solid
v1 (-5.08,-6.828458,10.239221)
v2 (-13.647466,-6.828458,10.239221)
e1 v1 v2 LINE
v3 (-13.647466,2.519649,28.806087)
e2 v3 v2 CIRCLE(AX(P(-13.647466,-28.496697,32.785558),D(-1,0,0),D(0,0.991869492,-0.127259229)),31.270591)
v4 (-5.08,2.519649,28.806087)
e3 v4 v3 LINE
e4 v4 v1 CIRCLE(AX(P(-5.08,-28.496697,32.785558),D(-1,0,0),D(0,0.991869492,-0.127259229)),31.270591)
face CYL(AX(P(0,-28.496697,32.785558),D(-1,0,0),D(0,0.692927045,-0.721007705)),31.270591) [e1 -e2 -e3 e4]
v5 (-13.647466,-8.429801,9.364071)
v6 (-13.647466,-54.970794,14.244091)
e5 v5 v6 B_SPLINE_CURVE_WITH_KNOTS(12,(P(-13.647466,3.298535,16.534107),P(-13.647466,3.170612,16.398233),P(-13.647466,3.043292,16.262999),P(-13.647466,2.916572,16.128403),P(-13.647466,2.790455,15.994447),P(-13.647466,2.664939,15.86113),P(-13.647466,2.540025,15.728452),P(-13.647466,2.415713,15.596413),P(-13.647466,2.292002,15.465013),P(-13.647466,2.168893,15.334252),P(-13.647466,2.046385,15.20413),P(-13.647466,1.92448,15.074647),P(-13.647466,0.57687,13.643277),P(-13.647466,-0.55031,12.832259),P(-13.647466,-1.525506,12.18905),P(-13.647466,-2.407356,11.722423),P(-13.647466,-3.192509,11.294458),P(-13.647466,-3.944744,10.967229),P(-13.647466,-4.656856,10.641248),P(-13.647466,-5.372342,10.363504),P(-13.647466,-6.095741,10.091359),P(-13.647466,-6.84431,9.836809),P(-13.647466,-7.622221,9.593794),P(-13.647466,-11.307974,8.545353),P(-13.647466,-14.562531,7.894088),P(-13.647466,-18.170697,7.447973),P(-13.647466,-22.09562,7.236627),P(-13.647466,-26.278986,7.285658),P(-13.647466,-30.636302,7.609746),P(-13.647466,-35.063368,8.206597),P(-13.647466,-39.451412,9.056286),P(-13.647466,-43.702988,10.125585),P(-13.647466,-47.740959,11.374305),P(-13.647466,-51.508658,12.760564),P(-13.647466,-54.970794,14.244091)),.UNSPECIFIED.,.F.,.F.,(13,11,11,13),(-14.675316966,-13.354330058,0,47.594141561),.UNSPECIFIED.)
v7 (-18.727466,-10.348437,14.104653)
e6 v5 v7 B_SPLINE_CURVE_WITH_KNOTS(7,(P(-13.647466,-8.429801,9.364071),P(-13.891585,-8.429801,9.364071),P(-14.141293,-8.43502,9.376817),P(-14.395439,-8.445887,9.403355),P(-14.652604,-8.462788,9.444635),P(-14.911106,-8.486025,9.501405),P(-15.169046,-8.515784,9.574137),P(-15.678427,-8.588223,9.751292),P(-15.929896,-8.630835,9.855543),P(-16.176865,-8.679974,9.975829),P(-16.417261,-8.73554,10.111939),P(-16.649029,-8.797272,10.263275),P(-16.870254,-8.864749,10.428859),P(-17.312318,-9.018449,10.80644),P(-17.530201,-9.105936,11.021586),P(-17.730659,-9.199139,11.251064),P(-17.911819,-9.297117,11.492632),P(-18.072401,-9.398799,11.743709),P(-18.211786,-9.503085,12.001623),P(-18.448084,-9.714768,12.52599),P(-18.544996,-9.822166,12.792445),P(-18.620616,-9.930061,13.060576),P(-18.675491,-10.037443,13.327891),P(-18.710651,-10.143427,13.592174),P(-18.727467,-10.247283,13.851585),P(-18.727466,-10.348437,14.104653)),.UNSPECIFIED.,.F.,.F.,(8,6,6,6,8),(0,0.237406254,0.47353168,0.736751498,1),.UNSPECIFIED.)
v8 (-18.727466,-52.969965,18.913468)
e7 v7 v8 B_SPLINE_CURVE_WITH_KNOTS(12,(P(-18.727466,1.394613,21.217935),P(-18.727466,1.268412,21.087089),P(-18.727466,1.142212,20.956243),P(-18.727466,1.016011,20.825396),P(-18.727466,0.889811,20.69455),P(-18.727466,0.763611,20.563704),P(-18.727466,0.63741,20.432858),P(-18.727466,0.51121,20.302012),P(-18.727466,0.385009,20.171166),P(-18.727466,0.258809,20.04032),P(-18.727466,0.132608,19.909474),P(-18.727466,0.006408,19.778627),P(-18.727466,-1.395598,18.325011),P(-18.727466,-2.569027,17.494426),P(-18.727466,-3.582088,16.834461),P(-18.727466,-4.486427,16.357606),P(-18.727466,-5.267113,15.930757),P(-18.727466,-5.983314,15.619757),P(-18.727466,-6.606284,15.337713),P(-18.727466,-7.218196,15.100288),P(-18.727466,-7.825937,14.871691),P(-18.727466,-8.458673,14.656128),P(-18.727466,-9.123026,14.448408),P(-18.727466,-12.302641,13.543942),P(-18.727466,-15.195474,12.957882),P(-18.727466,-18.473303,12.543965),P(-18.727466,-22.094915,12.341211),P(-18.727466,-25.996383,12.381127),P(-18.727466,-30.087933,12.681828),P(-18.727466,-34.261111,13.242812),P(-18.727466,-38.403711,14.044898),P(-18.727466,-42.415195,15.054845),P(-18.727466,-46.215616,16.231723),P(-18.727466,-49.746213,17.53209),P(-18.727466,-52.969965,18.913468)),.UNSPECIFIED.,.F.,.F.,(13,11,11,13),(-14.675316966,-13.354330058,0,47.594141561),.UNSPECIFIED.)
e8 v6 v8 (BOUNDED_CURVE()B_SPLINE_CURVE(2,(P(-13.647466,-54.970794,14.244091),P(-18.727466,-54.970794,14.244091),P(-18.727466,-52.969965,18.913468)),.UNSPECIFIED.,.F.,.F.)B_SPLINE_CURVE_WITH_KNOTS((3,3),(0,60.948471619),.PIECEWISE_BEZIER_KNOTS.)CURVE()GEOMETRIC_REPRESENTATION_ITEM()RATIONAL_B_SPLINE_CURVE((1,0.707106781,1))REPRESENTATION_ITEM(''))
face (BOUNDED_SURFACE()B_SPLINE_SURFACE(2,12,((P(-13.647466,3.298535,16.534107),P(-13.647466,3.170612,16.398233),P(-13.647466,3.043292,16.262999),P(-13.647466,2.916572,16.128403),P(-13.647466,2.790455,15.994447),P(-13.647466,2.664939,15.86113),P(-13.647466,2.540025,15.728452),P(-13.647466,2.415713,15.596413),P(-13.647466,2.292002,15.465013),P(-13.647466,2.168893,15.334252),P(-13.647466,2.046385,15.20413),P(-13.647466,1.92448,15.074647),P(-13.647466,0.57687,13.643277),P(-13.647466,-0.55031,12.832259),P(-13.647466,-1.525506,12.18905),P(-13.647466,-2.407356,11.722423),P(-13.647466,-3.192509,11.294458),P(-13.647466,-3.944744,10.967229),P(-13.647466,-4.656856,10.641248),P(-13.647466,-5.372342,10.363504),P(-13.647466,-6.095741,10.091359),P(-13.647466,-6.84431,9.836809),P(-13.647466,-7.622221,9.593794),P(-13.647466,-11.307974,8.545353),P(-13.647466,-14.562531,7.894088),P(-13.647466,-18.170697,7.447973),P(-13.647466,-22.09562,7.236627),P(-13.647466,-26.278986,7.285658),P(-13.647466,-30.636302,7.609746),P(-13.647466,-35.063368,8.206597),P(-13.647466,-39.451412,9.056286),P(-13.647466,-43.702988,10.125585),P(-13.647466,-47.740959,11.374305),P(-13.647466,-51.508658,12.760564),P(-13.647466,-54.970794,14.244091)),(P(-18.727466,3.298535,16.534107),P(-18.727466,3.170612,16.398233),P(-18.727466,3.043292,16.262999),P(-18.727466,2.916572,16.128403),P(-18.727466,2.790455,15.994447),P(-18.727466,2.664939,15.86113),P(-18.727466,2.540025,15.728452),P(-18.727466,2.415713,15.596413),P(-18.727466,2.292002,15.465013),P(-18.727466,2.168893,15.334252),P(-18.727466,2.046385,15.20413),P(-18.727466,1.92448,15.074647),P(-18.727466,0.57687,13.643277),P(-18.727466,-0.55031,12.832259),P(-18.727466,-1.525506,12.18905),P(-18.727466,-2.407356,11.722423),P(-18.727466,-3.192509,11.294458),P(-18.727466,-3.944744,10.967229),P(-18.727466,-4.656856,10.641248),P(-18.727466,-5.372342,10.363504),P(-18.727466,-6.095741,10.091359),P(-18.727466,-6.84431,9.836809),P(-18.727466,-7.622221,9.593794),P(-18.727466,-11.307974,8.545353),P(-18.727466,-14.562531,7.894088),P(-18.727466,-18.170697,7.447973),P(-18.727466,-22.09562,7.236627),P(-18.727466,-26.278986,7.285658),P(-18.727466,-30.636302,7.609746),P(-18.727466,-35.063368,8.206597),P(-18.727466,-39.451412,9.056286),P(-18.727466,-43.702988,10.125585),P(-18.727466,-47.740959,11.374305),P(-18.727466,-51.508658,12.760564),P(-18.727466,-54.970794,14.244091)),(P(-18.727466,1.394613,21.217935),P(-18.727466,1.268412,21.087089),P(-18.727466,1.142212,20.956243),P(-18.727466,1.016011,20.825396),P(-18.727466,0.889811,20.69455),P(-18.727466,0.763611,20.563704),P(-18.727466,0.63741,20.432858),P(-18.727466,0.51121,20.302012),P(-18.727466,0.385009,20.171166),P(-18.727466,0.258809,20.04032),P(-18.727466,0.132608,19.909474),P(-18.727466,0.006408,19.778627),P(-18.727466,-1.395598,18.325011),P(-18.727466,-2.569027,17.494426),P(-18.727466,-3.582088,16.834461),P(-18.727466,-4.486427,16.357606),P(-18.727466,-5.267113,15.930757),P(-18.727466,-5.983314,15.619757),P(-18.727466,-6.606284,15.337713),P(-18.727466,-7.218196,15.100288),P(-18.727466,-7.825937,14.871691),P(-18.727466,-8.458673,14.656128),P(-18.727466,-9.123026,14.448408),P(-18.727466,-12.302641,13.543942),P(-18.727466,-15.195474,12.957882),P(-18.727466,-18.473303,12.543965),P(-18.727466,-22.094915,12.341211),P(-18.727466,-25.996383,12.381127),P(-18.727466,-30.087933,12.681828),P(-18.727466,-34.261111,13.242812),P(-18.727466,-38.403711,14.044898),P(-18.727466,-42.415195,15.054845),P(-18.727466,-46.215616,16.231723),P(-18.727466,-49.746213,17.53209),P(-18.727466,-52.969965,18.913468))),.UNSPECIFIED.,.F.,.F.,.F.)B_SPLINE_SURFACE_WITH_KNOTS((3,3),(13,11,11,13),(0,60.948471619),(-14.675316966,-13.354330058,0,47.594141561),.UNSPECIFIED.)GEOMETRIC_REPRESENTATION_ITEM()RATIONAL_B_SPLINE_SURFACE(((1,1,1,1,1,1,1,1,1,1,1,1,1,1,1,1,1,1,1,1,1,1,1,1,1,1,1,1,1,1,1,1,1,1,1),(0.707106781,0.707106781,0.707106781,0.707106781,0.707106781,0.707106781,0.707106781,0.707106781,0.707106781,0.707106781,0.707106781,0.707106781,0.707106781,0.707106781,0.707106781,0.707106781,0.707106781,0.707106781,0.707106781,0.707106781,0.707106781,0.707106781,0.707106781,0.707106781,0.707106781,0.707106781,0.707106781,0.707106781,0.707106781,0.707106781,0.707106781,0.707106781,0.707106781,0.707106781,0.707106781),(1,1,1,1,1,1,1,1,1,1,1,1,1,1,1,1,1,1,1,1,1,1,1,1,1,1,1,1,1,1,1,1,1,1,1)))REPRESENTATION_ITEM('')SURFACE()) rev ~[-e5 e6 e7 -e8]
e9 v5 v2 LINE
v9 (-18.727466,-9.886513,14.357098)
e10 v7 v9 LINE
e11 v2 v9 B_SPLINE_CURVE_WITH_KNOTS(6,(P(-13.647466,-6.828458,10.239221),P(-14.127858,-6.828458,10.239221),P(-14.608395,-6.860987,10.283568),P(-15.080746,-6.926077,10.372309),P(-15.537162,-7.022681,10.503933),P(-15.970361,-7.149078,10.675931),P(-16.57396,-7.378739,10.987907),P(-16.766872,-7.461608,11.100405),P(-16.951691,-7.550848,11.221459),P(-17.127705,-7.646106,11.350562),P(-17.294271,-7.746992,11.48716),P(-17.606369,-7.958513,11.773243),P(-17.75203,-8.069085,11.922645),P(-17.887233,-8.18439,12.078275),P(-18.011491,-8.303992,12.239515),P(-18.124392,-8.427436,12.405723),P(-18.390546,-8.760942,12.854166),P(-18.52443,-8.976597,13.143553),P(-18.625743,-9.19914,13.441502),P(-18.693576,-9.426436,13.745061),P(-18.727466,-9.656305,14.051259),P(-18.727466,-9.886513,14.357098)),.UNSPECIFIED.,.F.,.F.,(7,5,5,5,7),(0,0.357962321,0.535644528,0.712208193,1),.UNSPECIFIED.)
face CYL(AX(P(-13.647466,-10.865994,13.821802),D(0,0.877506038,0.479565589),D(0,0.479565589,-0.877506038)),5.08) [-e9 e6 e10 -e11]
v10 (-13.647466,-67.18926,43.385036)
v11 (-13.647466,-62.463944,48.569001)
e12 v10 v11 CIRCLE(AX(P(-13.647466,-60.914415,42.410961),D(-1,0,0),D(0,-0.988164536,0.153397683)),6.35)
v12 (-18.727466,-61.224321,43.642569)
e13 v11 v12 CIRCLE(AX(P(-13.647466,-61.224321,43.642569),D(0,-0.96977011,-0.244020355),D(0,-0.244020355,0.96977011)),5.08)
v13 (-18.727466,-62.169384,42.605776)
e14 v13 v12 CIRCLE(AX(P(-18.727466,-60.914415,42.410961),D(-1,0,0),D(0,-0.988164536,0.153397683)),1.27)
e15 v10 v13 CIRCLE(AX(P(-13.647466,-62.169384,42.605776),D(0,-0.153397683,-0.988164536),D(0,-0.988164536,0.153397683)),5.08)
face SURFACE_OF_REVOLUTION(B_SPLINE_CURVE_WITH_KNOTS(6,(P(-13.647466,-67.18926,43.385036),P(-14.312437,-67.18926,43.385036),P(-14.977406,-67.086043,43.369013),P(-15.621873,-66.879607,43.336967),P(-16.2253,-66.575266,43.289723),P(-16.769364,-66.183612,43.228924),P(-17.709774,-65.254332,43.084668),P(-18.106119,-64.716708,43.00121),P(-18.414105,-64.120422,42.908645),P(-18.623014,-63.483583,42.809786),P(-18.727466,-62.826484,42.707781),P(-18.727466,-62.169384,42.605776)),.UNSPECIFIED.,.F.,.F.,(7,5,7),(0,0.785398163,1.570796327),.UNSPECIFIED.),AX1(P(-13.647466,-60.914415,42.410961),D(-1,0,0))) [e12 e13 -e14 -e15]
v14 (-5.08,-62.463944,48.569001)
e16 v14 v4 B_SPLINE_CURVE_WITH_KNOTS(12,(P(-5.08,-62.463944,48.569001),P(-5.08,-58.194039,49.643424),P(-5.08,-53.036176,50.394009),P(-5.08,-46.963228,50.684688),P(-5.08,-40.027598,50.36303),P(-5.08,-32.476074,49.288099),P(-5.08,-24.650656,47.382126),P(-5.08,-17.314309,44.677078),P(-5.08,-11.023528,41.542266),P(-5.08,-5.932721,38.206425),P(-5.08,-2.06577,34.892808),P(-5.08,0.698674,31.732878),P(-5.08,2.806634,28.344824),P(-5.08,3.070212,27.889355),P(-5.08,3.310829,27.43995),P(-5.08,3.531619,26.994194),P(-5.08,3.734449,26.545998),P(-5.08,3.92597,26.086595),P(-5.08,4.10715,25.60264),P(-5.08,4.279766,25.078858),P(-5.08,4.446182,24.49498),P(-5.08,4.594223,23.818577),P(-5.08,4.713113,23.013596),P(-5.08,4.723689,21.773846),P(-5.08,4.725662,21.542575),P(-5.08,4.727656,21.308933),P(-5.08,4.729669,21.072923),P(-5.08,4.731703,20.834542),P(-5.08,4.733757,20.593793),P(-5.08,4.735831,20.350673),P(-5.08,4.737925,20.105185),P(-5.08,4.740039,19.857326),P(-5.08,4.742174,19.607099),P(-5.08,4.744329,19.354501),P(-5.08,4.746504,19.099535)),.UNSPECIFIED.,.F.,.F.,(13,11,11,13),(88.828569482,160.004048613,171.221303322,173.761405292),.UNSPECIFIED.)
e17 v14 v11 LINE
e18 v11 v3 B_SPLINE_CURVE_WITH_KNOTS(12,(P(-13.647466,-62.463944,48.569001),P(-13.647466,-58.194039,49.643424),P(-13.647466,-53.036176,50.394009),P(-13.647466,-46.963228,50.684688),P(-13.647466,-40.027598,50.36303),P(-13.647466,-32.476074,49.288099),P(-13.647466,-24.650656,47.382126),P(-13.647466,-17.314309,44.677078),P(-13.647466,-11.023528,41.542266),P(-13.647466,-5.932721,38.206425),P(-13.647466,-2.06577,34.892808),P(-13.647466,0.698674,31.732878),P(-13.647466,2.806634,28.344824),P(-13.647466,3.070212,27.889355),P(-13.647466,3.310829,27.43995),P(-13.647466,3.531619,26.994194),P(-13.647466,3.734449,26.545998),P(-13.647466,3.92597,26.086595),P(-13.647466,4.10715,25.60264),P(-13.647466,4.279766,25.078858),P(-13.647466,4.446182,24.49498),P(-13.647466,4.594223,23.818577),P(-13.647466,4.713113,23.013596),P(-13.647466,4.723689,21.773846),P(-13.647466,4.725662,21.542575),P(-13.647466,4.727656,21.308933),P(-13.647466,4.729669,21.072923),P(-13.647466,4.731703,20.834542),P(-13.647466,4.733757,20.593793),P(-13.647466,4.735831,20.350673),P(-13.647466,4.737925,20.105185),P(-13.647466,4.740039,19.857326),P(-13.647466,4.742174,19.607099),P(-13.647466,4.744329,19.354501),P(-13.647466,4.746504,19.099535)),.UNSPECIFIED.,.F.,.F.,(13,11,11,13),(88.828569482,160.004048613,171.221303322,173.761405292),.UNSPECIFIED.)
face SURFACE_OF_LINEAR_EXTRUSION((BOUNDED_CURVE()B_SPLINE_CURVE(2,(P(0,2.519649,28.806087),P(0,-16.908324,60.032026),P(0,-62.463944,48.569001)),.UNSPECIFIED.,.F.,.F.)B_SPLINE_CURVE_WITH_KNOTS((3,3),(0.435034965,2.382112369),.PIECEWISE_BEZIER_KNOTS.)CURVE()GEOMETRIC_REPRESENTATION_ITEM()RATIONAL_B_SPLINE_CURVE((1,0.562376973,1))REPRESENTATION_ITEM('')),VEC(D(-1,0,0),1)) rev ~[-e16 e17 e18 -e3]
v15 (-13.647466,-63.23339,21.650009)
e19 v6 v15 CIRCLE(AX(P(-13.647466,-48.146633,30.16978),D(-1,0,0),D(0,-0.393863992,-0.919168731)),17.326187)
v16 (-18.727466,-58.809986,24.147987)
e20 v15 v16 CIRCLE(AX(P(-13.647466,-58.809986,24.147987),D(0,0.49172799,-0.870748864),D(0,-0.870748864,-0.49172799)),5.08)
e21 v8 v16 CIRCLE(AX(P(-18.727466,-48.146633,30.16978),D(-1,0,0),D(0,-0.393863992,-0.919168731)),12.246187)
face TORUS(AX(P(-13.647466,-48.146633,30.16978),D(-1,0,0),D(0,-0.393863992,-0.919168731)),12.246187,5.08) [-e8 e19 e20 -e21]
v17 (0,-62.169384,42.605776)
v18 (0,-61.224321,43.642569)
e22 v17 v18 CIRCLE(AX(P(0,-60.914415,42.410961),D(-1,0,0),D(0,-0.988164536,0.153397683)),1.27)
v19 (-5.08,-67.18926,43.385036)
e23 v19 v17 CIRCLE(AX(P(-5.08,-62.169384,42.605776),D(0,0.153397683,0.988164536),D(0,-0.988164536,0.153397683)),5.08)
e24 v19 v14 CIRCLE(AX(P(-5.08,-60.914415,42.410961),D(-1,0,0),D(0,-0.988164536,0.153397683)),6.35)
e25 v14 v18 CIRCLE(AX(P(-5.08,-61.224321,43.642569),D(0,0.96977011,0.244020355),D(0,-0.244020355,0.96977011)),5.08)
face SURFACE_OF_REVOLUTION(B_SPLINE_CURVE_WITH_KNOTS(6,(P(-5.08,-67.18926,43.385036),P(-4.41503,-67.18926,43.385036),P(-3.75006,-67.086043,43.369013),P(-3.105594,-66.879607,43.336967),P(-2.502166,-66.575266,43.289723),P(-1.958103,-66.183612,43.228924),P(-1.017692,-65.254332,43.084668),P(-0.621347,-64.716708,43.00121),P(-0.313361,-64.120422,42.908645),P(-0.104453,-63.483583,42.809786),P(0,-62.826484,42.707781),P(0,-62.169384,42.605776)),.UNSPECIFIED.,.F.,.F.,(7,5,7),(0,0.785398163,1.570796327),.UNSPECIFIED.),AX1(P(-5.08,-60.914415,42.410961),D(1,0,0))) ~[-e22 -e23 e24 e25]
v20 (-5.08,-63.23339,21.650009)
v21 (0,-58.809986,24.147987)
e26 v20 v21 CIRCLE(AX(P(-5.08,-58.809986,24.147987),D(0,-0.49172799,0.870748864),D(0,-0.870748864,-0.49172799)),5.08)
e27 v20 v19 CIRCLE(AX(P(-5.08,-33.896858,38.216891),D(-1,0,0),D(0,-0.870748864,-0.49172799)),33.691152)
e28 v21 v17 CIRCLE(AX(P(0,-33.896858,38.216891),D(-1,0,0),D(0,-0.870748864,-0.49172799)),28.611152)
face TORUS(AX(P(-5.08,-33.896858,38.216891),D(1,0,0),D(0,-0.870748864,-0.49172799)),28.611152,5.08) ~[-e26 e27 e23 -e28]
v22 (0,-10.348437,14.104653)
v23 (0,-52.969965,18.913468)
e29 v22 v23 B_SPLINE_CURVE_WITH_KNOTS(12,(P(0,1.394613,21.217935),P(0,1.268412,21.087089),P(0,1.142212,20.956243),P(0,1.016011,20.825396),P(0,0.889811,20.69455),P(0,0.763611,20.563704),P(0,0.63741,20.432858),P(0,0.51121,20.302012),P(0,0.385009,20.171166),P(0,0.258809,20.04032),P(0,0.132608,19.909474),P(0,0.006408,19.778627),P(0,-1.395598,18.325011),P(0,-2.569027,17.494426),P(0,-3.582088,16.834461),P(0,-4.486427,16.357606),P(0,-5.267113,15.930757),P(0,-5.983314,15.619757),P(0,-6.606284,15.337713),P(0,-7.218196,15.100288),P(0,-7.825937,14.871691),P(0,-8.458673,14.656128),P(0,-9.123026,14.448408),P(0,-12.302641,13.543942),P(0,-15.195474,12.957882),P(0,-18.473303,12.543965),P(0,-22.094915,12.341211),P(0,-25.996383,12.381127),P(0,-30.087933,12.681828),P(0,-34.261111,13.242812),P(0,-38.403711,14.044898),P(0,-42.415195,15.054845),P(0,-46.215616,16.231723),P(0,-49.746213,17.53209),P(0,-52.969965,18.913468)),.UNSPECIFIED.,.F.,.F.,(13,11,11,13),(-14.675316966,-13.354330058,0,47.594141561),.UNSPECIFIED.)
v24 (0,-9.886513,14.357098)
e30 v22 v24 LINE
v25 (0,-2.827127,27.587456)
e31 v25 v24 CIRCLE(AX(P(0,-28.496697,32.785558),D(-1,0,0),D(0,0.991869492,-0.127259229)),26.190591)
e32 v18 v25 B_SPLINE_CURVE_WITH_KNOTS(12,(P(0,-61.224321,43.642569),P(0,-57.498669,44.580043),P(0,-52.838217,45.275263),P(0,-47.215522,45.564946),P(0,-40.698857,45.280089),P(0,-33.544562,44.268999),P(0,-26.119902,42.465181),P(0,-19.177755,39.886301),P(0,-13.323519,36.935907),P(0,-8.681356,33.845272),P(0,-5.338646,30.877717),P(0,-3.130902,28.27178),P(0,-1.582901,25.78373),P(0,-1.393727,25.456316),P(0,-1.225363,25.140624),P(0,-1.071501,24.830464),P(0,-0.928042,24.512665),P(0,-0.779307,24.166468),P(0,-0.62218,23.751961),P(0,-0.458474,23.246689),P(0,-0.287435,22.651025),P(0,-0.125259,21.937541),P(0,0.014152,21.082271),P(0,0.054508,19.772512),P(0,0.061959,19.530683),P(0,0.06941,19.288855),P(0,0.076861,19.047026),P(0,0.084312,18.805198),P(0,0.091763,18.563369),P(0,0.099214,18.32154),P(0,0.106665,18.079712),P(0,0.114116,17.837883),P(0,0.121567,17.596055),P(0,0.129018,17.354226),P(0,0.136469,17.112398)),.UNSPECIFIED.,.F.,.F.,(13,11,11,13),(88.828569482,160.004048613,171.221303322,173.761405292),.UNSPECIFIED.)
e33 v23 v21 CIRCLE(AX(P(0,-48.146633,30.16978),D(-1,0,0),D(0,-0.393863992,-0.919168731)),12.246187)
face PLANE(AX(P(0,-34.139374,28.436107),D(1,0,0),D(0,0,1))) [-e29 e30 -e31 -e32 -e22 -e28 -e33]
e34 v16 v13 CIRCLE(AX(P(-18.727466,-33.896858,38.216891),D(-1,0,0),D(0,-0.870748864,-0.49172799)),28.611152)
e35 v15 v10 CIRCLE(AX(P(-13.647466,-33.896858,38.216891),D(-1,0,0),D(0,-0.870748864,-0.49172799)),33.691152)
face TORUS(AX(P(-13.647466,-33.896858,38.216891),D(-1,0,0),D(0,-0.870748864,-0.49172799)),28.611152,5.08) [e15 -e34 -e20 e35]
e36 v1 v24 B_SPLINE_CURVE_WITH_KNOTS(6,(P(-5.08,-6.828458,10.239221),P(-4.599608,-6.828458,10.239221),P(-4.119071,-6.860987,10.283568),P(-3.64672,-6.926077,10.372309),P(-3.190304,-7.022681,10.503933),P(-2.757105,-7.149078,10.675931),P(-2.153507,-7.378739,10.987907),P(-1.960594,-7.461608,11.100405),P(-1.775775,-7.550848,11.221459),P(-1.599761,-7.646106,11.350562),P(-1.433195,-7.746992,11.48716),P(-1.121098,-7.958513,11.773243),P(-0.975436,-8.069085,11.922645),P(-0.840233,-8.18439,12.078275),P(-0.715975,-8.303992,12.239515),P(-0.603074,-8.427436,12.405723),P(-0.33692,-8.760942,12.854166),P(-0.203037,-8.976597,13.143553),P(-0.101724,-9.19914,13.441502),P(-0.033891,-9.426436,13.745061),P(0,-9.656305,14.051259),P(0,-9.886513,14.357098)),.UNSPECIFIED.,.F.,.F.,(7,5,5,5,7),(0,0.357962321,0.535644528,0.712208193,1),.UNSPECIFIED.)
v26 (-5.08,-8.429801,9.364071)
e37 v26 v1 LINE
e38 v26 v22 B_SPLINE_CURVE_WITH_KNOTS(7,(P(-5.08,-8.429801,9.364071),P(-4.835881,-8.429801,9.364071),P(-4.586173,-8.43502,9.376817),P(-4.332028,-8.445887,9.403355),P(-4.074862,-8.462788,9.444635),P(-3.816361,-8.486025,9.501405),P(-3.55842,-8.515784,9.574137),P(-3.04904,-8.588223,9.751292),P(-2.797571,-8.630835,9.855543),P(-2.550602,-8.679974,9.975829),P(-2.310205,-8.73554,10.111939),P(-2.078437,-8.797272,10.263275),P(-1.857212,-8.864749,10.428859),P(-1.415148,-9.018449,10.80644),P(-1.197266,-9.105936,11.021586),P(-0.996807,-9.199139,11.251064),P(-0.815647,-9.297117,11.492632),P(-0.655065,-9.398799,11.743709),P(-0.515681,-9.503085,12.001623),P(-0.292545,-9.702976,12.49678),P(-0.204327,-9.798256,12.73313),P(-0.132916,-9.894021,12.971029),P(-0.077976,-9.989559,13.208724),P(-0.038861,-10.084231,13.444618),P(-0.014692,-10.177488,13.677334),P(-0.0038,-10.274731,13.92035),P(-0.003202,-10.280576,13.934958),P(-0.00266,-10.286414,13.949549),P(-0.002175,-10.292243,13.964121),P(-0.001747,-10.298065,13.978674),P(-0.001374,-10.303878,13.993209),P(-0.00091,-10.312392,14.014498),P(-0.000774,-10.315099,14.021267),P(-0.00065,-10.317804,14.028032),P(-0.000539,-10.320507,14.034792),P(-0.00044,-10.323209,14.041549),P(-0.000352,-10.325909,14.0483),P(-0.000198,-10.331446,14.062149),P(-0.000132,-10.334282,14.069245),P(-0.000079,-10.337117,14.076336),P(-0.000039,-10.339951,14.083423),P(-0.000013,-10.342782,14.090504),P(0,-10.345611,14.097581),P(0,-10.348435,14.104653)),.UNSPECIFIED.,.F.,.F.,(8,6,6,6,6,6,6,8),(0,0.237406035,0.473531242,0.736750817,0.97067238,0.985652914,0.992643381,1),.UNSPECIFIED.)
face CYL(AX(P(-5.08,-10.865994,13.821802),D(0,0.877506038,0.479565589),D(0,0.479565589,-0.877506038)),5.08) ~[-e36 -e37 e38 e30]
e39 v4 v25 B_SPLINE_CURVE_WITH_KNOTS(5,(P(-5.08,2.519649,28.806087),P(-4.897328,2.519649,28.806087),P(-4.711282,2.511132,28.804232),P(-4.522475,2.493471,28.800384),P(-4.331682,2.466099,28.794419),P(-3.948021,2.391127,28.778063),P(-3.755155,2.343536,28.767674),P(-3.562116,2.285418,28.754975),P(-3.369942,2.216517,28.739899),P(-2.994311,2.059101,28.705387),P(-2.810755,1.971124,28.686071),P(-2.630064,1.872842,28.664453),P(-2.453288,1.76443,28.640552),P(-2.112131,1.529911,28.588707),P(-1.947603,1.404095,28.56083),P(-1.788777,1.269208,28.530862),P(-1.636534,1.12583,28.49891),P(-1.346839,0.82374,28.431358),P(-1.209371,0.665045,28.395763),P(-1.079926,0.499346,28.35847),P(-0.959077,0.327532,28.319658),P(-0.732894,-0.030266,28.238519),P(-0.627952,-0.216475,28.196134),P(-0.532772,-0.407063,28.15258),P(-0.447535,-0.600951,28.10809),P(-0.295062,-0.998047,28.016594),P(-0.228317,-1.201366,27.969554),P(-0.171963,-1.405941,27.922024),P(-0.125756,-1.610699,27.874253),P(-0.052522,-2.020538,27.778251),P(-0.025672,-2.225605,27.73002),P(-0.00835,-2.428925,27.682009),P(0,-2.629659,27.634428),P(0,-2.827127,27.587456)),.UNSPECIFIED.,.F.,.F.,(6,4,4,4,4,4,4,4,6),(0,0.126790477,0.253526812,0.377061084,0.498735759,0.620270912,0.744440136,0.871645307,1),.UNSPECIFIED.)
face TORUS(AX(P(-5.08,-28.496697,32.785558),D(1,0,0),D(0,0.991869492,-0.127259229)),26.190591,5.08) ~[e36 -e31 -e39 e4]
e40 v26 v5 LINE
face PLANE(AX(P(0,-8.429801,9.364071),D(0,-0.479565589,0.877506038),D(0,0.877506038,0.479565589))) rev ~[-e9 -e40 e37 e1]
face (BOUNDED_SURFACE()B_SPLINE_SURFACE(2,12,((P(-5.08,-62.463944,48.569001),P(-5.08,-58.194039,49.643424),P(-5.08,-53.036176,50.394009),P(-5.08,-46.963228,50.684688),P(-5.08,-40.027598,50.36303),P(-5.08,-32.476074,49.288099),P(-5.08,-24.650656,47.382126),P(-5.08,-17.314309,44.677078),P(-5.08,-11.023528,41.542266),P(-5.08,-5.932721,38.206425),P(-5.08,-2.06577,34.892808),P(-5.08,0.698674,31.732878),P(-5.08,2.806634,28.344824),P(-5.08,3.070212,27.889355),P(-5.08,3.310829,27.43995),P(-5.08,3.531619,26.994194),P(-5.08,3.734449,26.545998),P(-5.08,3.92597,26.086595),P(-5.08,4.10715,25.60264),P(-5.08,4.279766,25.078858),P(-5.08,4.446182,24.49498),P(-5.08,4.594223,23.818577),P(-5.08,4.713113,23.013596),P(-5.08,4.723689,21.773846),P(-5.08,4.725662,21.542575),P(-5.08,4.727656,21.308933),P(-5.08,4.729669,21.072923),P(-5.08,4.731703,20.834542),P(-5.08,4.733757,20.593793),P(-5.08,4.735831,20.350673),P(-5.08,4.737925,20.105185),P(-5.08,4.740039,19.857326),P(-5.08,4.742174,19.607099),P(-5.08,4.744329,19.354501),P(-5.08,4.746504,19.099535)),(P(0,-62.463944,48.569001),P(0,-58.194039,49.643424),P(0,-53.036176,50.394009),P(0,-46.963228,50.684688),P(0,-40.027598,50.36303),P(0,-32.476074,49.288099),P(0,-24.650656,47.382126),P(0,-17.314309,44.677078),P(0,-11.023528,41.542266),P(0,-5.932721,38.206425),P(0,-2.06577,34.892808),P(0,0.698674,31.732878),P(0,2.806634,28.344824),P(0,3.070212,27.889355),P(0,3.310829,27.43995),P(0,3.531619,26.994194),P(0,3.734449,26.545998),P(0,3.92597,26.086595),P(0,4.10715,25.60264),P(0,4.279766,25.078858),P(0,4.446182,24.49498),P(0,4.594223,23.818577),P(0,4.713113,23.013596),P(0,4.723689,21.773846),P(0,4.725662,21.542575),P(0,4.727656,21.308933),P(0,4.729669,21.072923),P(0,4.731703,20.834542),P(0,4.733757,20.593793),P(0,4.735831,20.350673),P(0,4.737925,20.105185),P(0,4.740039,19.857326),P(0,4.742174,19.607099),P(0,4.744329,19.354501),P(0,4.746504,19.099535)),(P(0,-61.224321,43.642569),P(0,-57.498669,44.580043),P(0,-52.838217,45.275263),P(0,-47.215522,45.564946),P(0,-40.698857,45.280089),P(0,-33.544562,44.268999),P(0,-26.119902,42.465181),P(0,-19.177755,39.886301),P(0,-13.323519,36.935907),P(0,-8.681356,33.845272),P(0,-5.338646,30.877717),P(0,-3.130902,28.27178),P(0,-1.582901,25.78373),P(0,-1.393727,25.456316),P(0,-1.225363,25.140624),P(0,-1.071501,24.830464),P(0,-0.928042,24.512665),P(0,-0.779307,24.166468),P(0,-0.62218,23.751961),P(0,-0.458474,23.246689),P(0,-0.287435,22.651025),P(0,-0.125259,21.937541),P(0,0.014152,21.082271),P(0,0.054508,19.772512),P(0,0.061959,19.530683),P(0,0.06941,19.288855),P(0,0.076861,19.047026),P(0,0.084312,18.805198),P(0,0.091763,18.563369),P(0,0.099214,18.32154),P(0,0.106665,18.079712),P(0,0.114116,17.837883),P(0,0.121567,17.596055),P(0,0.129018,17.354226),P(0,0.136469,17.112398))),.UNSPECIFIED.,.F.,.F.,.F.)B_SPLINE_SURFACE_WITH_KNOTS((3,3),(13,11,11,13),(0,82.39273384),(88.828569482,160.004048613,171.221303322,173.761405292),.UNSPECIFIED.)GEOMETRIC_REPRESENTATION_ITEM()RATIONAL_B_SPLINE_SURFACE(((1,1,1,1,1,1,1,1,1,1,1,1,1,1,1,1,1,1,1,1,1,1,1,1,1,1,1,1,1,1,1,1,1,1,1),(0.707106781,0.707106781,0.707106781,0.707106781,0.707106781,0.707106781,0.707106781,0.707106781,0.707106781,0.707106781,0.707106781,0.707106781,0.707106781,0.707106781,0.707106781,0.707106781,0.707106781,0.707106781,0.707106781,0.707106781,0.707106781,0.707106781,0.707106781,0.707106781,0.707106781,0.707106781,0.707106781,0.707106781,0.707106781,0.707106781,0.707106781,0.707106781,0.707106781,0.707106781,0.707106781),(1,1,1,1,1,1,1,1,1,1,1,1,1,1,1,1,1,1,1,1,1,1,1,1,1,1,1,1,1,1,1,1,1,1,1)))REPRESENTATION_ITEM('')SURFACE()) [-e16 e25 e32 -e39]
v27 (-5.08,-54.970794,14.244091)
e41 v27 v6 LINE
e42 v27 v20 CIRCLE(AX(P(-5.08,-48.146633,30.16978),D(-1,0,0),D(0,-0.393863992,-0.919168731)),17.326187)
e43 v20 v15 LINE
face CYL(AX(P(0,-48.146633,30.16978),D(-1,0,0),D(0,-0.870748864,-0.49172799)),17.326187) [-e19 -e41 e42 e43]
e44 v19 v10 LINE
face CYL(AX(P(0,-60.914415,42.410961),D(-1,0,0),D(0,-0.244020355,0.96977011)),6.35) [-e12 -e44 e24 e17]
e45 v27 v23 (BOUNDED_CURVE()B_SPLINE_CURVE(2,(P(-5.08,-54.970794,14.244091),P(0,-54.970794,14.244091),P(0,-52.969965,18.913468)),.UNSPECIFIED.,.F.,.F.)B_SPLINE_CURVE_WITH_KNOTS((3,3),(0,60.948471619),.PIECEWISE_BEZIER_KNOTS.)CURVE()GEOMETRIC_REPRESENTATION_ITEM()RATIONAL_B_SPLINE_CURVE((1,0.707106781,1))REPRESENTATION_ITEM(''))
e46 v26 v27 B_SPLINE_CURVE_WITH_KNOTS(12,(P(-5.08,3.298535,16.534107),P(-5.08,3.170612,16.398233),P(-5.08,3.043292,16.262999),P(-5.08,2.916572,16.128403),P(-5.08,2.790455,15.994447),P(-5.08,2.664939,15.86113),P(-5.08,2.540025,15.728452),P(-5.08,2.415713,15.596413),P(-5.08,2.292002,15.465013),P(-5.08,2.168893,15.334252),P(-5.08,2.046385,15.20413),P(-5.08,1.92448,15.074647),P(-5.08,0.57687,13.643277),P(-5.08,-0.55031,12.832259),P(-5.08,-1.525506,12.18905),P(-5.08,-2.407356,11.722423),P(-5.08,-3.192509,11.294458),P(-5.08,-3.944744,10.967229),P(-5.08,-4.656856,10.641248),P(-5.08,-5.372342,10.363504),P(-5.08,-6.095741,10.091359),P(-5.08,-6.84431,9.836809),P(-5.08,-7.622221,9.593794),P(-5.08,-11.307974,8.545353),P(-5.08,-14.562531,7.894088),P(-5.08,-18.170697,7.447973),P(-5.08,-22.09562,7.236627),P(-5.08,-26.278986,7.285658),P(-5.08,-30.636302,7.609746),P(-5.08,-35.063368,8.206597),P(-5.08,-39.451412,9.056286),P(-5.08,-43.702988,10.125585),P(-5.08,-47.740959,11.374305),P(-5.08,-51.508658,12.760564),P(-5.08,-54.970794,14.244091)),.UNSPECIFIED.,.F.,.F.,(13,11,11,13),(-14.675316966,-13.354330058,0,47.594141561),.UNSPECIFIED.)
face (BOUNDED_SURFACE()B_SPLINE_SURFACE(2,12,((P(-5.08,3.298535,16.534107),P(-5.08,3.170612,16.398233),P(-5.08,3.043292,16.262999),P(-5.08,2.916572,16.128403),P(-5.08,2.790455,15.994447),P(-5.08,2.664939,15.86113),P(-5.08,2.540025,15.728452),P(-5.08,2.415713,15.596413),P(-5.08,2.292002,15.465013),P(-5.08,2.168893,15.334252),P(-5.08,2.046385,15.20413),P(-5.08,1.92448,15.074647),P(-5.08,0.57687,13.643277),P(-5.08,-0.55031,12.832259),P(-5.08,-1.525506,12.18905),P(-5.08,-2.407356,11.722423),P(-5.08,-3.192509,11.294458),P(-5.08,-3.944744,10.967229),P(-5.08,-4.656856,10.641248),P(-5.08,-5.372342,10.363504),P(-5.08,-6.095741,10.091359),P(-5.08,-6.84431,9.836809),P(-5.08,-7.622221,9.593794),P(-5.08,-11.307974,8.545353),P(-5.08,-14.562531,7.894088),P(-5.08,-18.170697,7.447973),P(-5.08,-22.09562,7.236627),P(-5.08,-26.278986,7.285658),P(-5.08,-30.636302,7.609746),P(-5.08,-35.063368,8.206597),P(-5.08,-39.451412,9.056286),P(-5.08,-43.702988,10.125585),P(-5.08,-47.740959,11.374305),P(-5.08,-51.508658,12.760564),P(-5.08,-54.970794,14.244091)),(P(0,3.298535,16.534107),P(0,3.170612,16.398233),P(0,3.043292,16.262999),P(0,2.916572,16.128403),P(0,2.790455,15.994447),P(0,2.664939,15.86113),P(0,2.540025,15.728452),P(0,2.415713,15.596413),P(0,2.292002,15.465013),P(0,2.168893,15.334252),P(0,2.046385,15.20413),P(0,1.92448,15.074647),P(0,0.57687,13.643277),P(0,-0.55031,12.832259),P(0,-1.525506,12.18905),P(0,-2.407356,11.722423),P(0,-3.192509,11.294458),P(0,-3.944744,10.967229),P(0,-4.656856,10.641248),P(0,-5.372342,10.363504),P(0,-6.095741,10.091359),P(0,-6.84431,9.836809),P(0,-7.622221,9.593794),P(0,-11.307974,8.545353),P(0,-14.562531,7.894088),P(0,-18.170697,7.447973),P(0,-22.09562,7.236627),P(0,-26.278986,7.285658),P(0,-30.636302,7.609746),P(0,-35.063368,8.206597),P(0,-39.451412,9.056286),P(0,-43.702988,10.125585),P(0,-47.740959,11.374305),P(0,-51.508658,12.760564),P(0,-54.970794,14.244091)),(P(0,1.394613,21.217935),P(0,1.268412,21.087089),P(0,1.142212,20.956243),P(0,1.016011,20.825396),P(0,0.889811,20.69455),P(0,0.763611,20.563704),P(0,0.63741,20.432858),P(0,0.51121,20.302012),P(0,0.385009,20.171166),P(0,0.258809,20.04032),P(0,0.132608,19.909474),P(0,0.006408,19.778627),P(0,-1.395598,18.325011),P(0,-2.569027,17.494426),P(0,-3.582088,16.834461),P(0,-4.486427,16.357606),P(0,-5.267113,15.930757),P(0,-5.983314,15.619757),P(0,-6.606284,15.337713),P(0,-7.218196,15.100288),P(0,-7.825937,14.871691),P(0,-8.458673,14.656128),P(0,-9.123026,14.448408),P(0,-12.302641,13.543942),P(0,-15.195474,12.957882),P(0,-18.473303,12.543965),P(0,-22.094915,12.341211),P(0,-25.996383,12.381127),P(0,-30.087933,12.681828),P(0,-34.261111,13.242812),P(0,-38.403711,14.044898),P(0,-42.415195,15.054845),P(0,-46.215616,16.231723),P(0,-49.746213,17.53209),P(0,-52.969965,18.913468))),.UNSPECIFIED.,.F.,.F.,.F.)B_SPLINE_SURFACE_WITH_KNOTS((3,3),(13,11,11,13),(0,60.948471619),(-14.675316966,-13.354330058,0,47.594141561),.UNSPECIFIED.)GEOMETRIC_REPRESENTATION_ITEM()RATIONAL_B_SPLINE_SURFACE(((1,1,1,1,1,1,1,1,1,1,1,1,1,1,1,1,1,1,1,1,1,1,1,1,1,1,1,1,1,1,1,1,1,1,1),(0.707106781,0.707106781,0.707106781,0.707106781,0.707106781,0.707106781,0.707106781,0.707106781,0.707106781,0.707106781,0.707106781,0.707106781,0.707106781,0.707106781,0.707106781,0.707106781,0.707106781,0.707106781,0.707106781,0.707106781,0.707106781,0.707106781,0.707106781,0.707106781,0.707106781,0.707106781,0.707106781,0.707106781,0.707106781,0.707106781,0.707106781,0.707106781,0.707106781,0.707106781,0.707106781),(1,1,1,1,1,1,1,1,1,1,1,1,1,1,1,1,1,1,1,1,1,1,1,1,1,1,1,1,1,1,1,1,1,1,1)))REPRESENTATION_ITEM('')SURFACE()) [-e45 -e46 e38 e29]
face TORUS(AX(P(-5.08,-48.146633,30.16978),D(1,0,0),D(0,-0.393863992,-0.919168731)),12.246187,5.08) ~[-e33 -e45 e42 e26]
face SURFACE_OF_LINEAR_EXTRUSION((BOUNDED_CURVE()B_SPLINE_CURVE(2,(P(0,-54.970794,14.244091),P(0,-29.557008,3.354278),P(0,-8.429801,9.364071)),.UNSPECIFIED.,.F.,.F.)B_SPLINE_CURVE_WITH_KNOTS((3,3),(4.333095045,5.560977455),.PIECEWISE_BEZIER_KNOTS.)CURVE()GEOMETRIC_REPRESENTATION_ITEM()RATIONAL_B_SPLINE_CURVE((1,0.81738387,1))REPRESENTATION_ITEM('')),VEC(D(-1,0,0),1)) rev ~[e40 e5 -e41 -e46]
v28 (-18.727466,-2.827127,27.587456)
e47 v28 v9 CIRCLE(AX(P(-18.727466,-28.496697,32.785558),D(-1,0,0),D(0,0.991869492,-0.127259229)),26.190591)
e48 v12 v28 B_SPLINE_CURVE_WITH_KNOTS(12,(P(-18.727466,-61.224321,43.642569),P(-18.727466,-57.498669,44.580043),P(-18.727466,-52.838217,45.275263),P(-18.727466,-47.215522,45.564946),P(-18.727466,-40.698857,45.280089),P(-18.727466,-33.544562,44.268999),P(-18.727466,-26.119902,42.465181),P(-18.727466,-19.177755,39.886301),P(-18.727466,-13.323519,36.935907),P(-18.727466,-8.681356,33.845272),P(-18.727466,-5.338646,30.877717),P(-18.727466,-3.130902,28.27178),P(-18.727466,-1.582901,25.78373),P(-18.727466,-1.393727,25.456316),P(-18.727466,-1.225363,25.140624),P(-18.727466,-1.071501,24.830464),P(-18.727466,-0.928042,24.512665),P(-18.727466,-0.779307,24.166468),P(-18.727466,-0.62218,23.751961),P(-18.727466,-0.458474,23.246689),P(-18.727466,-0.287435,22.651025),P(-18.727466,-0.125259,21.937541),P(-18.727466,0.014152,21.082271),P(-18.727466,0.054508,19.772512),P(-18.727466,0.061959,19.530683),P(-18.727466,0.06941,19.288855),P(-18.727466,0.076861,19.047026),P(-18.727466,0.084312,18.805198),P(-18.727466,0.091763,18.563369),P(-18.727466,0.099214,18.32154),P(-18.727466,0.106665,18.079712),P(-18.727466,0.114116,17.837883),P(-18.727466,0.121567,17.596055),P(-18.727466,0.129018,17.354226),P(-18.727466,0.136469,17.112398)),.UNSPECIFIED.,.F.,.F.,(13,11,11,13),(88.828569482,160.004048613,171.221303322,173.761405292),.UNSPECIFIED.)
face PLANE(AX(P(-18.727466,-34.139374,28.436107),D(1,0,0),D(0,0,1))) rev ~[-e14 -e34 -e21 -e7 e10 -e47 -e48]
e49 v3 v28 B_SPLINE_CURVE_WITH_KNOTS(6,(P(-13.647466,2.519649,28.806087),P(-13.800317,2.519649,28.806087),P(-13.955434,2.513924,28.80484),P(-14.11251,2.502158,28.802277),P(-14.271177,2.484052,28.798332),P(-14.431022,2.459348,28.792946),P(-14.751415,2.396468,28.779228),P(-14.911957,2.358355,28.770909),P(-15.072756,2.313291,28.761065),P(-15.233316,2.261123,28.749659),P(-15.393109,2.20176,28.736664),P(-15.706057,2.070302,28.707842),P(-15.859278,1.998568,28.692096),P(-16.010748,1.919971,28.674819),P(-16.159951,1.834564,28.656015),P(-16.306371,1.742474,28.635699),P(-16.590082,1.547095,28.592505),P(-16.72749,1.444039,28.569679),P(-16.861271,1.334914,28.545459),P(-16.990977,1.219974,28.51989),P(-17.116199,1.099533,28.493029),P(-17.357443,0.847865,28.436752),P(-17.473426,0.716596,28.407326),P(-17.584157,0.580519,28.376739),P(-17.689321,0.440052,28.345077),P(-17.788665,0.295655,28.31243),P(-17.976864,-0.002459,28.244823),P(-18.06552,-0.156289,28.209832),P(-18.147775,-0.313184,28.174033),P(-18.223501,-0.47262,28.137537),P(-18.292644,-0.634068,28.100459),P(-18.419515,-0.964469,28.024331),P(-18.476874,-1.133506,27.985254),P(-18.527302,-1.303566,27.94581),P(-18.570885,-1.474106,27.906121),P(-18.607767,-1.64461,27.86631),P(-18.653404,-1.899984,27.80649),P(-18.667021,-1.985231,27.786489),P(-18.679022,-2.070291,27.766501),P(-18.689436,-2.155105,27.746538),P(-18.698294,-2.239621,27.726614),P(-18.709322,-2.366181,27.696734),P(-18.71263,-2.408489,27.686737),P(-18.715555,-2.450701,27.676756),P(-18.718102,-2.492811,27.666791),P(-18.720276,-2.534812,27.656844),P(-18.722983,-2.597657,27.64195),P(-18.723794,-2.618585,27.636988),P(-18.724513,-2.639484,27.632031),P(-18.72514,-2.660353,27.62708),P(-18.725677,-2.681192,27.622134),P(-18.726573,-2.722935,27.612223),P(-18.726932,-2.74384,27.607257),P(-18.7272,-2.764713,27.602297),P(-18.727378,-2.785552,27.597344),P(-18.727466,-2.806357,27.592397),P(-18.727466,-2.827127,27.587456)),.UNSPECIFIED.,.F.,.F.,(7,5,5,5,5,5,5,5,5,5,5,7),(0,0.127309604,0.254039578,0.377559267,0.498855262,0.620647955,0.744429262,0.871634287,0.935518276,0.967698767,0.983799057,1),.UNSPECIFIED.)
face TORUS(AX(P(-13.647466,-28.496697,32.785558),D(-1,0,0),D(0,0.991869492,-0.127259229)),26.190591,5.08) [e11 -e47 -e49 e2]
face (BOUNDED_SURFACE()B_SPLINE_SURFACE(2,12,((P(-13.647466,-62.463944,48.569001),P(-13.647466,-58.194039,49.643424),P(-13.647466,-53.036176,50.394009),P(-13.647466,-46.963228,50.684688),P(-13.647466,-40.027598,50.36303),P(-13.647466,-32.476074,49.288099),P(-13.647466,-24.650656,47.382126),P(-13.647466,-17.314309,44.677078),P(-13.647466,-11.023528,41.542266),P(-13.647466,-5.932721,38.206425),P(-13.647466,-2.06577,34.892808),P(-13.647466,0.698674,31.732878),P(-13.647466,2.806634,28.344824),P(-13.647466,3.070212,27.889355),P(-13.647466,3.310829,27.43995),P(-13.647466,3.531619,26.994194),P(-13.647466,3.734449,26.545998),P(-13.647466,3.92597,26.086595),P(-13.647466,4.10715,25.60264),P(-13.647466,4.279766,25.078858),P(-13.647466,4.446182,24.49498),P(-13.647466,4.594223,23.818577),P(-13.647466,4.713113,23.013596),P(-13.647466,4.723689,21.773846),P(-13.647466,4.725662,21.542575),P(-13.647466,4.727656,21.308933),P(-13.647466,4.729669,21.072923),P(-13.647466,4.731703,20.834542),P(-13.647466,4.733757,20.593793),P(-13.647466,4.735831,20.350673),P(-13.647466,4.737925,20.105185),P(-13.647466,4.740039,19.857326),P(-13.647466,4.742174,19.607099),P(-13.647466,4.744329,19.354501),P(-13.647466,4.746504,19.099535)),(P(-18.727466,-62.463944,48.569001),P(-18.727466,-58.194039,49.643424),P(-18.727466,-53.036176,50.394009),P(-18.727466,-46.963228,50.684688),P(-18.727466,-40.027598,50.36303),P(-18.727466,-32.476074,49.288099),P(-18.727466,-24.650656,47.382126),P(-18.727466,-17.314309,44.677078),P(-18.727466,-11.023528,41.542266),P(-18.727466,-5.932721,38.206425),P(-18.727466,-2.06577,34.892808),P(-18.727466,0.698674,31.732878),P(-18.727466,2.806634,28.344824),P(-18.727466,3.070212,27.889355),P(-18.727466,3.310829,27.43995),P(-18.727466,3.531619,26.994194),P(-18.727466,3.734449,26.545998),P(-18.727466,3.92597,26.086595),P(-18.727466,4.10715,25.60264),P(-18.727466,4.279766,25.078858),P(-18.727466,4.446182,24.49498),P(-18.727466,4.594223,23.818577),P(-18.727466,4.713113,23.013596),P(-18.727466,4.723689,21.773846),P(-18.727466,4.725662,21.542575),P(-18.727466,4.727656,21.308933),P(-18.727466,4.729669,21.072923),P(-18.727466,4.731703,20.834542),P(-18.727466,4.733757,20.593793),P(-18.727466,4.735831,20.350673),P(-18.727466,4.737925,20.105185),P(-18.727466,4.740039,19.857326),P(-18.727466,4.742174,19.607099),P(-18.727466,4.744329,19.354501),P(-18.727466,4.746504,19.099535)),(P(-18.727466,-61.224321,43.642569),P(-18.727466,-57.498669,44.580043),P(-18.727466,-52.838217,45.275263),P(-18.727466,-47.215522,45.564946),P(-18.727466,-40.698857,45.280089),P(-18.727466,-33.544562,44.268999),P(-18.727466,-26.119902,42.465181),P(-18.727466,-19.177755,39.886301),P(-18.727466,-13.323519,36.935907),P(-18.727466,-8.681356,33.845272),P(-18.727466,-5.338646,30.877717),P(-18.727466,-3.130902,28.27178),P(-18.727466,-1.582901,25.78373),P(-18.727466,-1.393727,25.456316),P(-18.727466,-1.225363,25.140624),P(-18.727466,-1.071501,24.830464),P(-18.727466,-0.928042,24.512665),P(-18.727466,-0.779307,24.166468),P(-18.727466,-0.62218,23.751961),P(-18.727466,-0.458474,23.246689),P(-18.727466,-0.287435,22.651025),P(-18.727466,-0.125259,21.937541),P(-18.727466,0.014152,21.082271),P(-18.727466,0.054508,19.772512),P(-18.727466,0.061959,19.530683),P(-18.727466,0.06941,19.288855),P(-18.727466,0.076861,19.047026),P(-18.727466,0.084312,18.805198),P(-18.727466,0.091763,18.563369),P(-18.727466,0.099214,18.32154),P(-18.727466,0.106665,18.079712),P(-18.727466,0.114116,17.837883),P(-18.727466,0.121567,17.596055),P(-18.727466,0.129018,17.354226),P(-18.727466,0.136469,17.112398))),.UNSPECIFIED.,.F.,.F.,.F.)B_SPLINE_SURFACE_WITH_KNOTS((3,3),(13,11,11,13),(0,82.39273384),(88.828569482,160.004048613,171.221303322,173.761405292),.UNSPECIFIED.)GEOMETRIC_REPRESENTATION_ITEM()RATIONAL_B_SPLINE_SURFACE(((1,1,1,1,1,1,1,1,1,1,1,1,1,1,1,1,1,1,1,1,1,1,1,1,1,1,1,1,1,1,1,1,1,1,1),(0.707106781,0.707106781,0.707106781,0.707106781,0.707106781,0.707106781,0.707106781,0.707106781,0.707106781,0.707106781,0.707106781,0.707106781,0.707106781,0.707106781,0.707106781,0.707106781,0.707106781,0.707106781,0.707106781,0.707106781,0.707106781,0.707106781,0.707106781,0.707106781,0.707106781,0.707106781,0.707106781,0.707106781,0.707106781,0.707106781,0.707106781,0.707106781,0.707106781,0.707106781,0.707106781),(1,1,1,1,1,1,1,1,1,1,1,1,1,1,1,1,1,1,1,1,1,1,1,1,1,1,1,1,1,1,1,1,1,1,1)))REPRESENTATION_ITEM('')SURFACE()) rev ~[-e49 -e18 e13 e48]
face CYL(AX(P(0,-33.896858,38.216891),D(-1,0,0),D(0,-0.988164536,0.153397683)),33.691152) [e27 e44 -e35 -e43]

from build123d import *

# Parameters (mm, degrees)
F3_R = 5.08


with BuildPart() as f2:
    # F2: sweep along a path in F1
    with BuildLine(Plane.XZ) as f2_path:
        Line((-18.7538489699, 37.0099879801), (-37.481315434, 37.0099879801))
    # F0 (on Right) → F2 (sweep)
    with BuildSketch(Plane.YZ):
        with BuildLine():
            ThreePointArc((-63.2333904502, 21.6500088574), (-59.7109744357, 17.267735227), (-54.9707940163, 14.2440906808))
            add(Edge.make_bspline(
                [(-54.9707940163, 14.2440906808), (-29.557007786, 3.354277996), (-8.4298012229, 9.3640714915)],
                knots=[4.3330950452, 4.3330950452, 4.3330950452, 5.560977455, 5.560977455, 5.560977455], degree=2, weights=[1, 0.8173838698, 1]))
            Line((-8.4298012229, 9.3640714915), (-6.8284584686, 10.2392208894))
            ThreePointArc((-6.8284584686, 10.2392208894), (-0.5664539631, 18.7231469313), (2.5196485221, 28.8060866296))
            add(Edge.make_bspline(
                [(2.5196485221, 28.8060866296), (-16.9083238195, 60.0320255806), (-62.463944192, 48.5690009646)],
                knots=[0.4350349648, 0.4350349648, 0.4350349648, 2.3821123688, 2.3821123688, 2.3821123688], degree=2, weights=[1, 0.5623769731, 1]))
            ThreePointArc((-62.463944192, 48.5690009646), (-65.6073437062, 46.688684411), (-67.1892597454, 43.38503605))
            ThreePointArc((-67.1892597454, 43.38503605), (-67.0434822848, 32.1840618928), (-63.2333904502, 21.6500088574))
        make_face()
    sweep(path=f2_path.line)

    # F3
    f3_edges = [f2.edges().sort_by_distance(p)[0] for p in [
        (-18.727466, -67.043482, 32.184062),
        (-18.727466, -59.710974, 17.267735),
        (-18.727466, -32.047448, 8.151815),
        (-18.727466, -7.62913, 9.801646),
        (-18.727466, -0.566454, 18.723147),
        (-18.727466, -27.276683, 46.954007),
        (-18.727466, -65.607344, 46.688684),
        (0, -67.043482, 32.184062),
        (0, -59.710974, 17.267735),
        (0, -30.736335, 8.00371),
        (0, -7.62913, 9.801646),
        (0, -0.566454, 18.723147),
        (0, -25.26983, 46.370482),
        (0, -65.607344, 46.688684),
    ]]
    fillet(f3_edges, radius=F3_R)


solid = f2.part
